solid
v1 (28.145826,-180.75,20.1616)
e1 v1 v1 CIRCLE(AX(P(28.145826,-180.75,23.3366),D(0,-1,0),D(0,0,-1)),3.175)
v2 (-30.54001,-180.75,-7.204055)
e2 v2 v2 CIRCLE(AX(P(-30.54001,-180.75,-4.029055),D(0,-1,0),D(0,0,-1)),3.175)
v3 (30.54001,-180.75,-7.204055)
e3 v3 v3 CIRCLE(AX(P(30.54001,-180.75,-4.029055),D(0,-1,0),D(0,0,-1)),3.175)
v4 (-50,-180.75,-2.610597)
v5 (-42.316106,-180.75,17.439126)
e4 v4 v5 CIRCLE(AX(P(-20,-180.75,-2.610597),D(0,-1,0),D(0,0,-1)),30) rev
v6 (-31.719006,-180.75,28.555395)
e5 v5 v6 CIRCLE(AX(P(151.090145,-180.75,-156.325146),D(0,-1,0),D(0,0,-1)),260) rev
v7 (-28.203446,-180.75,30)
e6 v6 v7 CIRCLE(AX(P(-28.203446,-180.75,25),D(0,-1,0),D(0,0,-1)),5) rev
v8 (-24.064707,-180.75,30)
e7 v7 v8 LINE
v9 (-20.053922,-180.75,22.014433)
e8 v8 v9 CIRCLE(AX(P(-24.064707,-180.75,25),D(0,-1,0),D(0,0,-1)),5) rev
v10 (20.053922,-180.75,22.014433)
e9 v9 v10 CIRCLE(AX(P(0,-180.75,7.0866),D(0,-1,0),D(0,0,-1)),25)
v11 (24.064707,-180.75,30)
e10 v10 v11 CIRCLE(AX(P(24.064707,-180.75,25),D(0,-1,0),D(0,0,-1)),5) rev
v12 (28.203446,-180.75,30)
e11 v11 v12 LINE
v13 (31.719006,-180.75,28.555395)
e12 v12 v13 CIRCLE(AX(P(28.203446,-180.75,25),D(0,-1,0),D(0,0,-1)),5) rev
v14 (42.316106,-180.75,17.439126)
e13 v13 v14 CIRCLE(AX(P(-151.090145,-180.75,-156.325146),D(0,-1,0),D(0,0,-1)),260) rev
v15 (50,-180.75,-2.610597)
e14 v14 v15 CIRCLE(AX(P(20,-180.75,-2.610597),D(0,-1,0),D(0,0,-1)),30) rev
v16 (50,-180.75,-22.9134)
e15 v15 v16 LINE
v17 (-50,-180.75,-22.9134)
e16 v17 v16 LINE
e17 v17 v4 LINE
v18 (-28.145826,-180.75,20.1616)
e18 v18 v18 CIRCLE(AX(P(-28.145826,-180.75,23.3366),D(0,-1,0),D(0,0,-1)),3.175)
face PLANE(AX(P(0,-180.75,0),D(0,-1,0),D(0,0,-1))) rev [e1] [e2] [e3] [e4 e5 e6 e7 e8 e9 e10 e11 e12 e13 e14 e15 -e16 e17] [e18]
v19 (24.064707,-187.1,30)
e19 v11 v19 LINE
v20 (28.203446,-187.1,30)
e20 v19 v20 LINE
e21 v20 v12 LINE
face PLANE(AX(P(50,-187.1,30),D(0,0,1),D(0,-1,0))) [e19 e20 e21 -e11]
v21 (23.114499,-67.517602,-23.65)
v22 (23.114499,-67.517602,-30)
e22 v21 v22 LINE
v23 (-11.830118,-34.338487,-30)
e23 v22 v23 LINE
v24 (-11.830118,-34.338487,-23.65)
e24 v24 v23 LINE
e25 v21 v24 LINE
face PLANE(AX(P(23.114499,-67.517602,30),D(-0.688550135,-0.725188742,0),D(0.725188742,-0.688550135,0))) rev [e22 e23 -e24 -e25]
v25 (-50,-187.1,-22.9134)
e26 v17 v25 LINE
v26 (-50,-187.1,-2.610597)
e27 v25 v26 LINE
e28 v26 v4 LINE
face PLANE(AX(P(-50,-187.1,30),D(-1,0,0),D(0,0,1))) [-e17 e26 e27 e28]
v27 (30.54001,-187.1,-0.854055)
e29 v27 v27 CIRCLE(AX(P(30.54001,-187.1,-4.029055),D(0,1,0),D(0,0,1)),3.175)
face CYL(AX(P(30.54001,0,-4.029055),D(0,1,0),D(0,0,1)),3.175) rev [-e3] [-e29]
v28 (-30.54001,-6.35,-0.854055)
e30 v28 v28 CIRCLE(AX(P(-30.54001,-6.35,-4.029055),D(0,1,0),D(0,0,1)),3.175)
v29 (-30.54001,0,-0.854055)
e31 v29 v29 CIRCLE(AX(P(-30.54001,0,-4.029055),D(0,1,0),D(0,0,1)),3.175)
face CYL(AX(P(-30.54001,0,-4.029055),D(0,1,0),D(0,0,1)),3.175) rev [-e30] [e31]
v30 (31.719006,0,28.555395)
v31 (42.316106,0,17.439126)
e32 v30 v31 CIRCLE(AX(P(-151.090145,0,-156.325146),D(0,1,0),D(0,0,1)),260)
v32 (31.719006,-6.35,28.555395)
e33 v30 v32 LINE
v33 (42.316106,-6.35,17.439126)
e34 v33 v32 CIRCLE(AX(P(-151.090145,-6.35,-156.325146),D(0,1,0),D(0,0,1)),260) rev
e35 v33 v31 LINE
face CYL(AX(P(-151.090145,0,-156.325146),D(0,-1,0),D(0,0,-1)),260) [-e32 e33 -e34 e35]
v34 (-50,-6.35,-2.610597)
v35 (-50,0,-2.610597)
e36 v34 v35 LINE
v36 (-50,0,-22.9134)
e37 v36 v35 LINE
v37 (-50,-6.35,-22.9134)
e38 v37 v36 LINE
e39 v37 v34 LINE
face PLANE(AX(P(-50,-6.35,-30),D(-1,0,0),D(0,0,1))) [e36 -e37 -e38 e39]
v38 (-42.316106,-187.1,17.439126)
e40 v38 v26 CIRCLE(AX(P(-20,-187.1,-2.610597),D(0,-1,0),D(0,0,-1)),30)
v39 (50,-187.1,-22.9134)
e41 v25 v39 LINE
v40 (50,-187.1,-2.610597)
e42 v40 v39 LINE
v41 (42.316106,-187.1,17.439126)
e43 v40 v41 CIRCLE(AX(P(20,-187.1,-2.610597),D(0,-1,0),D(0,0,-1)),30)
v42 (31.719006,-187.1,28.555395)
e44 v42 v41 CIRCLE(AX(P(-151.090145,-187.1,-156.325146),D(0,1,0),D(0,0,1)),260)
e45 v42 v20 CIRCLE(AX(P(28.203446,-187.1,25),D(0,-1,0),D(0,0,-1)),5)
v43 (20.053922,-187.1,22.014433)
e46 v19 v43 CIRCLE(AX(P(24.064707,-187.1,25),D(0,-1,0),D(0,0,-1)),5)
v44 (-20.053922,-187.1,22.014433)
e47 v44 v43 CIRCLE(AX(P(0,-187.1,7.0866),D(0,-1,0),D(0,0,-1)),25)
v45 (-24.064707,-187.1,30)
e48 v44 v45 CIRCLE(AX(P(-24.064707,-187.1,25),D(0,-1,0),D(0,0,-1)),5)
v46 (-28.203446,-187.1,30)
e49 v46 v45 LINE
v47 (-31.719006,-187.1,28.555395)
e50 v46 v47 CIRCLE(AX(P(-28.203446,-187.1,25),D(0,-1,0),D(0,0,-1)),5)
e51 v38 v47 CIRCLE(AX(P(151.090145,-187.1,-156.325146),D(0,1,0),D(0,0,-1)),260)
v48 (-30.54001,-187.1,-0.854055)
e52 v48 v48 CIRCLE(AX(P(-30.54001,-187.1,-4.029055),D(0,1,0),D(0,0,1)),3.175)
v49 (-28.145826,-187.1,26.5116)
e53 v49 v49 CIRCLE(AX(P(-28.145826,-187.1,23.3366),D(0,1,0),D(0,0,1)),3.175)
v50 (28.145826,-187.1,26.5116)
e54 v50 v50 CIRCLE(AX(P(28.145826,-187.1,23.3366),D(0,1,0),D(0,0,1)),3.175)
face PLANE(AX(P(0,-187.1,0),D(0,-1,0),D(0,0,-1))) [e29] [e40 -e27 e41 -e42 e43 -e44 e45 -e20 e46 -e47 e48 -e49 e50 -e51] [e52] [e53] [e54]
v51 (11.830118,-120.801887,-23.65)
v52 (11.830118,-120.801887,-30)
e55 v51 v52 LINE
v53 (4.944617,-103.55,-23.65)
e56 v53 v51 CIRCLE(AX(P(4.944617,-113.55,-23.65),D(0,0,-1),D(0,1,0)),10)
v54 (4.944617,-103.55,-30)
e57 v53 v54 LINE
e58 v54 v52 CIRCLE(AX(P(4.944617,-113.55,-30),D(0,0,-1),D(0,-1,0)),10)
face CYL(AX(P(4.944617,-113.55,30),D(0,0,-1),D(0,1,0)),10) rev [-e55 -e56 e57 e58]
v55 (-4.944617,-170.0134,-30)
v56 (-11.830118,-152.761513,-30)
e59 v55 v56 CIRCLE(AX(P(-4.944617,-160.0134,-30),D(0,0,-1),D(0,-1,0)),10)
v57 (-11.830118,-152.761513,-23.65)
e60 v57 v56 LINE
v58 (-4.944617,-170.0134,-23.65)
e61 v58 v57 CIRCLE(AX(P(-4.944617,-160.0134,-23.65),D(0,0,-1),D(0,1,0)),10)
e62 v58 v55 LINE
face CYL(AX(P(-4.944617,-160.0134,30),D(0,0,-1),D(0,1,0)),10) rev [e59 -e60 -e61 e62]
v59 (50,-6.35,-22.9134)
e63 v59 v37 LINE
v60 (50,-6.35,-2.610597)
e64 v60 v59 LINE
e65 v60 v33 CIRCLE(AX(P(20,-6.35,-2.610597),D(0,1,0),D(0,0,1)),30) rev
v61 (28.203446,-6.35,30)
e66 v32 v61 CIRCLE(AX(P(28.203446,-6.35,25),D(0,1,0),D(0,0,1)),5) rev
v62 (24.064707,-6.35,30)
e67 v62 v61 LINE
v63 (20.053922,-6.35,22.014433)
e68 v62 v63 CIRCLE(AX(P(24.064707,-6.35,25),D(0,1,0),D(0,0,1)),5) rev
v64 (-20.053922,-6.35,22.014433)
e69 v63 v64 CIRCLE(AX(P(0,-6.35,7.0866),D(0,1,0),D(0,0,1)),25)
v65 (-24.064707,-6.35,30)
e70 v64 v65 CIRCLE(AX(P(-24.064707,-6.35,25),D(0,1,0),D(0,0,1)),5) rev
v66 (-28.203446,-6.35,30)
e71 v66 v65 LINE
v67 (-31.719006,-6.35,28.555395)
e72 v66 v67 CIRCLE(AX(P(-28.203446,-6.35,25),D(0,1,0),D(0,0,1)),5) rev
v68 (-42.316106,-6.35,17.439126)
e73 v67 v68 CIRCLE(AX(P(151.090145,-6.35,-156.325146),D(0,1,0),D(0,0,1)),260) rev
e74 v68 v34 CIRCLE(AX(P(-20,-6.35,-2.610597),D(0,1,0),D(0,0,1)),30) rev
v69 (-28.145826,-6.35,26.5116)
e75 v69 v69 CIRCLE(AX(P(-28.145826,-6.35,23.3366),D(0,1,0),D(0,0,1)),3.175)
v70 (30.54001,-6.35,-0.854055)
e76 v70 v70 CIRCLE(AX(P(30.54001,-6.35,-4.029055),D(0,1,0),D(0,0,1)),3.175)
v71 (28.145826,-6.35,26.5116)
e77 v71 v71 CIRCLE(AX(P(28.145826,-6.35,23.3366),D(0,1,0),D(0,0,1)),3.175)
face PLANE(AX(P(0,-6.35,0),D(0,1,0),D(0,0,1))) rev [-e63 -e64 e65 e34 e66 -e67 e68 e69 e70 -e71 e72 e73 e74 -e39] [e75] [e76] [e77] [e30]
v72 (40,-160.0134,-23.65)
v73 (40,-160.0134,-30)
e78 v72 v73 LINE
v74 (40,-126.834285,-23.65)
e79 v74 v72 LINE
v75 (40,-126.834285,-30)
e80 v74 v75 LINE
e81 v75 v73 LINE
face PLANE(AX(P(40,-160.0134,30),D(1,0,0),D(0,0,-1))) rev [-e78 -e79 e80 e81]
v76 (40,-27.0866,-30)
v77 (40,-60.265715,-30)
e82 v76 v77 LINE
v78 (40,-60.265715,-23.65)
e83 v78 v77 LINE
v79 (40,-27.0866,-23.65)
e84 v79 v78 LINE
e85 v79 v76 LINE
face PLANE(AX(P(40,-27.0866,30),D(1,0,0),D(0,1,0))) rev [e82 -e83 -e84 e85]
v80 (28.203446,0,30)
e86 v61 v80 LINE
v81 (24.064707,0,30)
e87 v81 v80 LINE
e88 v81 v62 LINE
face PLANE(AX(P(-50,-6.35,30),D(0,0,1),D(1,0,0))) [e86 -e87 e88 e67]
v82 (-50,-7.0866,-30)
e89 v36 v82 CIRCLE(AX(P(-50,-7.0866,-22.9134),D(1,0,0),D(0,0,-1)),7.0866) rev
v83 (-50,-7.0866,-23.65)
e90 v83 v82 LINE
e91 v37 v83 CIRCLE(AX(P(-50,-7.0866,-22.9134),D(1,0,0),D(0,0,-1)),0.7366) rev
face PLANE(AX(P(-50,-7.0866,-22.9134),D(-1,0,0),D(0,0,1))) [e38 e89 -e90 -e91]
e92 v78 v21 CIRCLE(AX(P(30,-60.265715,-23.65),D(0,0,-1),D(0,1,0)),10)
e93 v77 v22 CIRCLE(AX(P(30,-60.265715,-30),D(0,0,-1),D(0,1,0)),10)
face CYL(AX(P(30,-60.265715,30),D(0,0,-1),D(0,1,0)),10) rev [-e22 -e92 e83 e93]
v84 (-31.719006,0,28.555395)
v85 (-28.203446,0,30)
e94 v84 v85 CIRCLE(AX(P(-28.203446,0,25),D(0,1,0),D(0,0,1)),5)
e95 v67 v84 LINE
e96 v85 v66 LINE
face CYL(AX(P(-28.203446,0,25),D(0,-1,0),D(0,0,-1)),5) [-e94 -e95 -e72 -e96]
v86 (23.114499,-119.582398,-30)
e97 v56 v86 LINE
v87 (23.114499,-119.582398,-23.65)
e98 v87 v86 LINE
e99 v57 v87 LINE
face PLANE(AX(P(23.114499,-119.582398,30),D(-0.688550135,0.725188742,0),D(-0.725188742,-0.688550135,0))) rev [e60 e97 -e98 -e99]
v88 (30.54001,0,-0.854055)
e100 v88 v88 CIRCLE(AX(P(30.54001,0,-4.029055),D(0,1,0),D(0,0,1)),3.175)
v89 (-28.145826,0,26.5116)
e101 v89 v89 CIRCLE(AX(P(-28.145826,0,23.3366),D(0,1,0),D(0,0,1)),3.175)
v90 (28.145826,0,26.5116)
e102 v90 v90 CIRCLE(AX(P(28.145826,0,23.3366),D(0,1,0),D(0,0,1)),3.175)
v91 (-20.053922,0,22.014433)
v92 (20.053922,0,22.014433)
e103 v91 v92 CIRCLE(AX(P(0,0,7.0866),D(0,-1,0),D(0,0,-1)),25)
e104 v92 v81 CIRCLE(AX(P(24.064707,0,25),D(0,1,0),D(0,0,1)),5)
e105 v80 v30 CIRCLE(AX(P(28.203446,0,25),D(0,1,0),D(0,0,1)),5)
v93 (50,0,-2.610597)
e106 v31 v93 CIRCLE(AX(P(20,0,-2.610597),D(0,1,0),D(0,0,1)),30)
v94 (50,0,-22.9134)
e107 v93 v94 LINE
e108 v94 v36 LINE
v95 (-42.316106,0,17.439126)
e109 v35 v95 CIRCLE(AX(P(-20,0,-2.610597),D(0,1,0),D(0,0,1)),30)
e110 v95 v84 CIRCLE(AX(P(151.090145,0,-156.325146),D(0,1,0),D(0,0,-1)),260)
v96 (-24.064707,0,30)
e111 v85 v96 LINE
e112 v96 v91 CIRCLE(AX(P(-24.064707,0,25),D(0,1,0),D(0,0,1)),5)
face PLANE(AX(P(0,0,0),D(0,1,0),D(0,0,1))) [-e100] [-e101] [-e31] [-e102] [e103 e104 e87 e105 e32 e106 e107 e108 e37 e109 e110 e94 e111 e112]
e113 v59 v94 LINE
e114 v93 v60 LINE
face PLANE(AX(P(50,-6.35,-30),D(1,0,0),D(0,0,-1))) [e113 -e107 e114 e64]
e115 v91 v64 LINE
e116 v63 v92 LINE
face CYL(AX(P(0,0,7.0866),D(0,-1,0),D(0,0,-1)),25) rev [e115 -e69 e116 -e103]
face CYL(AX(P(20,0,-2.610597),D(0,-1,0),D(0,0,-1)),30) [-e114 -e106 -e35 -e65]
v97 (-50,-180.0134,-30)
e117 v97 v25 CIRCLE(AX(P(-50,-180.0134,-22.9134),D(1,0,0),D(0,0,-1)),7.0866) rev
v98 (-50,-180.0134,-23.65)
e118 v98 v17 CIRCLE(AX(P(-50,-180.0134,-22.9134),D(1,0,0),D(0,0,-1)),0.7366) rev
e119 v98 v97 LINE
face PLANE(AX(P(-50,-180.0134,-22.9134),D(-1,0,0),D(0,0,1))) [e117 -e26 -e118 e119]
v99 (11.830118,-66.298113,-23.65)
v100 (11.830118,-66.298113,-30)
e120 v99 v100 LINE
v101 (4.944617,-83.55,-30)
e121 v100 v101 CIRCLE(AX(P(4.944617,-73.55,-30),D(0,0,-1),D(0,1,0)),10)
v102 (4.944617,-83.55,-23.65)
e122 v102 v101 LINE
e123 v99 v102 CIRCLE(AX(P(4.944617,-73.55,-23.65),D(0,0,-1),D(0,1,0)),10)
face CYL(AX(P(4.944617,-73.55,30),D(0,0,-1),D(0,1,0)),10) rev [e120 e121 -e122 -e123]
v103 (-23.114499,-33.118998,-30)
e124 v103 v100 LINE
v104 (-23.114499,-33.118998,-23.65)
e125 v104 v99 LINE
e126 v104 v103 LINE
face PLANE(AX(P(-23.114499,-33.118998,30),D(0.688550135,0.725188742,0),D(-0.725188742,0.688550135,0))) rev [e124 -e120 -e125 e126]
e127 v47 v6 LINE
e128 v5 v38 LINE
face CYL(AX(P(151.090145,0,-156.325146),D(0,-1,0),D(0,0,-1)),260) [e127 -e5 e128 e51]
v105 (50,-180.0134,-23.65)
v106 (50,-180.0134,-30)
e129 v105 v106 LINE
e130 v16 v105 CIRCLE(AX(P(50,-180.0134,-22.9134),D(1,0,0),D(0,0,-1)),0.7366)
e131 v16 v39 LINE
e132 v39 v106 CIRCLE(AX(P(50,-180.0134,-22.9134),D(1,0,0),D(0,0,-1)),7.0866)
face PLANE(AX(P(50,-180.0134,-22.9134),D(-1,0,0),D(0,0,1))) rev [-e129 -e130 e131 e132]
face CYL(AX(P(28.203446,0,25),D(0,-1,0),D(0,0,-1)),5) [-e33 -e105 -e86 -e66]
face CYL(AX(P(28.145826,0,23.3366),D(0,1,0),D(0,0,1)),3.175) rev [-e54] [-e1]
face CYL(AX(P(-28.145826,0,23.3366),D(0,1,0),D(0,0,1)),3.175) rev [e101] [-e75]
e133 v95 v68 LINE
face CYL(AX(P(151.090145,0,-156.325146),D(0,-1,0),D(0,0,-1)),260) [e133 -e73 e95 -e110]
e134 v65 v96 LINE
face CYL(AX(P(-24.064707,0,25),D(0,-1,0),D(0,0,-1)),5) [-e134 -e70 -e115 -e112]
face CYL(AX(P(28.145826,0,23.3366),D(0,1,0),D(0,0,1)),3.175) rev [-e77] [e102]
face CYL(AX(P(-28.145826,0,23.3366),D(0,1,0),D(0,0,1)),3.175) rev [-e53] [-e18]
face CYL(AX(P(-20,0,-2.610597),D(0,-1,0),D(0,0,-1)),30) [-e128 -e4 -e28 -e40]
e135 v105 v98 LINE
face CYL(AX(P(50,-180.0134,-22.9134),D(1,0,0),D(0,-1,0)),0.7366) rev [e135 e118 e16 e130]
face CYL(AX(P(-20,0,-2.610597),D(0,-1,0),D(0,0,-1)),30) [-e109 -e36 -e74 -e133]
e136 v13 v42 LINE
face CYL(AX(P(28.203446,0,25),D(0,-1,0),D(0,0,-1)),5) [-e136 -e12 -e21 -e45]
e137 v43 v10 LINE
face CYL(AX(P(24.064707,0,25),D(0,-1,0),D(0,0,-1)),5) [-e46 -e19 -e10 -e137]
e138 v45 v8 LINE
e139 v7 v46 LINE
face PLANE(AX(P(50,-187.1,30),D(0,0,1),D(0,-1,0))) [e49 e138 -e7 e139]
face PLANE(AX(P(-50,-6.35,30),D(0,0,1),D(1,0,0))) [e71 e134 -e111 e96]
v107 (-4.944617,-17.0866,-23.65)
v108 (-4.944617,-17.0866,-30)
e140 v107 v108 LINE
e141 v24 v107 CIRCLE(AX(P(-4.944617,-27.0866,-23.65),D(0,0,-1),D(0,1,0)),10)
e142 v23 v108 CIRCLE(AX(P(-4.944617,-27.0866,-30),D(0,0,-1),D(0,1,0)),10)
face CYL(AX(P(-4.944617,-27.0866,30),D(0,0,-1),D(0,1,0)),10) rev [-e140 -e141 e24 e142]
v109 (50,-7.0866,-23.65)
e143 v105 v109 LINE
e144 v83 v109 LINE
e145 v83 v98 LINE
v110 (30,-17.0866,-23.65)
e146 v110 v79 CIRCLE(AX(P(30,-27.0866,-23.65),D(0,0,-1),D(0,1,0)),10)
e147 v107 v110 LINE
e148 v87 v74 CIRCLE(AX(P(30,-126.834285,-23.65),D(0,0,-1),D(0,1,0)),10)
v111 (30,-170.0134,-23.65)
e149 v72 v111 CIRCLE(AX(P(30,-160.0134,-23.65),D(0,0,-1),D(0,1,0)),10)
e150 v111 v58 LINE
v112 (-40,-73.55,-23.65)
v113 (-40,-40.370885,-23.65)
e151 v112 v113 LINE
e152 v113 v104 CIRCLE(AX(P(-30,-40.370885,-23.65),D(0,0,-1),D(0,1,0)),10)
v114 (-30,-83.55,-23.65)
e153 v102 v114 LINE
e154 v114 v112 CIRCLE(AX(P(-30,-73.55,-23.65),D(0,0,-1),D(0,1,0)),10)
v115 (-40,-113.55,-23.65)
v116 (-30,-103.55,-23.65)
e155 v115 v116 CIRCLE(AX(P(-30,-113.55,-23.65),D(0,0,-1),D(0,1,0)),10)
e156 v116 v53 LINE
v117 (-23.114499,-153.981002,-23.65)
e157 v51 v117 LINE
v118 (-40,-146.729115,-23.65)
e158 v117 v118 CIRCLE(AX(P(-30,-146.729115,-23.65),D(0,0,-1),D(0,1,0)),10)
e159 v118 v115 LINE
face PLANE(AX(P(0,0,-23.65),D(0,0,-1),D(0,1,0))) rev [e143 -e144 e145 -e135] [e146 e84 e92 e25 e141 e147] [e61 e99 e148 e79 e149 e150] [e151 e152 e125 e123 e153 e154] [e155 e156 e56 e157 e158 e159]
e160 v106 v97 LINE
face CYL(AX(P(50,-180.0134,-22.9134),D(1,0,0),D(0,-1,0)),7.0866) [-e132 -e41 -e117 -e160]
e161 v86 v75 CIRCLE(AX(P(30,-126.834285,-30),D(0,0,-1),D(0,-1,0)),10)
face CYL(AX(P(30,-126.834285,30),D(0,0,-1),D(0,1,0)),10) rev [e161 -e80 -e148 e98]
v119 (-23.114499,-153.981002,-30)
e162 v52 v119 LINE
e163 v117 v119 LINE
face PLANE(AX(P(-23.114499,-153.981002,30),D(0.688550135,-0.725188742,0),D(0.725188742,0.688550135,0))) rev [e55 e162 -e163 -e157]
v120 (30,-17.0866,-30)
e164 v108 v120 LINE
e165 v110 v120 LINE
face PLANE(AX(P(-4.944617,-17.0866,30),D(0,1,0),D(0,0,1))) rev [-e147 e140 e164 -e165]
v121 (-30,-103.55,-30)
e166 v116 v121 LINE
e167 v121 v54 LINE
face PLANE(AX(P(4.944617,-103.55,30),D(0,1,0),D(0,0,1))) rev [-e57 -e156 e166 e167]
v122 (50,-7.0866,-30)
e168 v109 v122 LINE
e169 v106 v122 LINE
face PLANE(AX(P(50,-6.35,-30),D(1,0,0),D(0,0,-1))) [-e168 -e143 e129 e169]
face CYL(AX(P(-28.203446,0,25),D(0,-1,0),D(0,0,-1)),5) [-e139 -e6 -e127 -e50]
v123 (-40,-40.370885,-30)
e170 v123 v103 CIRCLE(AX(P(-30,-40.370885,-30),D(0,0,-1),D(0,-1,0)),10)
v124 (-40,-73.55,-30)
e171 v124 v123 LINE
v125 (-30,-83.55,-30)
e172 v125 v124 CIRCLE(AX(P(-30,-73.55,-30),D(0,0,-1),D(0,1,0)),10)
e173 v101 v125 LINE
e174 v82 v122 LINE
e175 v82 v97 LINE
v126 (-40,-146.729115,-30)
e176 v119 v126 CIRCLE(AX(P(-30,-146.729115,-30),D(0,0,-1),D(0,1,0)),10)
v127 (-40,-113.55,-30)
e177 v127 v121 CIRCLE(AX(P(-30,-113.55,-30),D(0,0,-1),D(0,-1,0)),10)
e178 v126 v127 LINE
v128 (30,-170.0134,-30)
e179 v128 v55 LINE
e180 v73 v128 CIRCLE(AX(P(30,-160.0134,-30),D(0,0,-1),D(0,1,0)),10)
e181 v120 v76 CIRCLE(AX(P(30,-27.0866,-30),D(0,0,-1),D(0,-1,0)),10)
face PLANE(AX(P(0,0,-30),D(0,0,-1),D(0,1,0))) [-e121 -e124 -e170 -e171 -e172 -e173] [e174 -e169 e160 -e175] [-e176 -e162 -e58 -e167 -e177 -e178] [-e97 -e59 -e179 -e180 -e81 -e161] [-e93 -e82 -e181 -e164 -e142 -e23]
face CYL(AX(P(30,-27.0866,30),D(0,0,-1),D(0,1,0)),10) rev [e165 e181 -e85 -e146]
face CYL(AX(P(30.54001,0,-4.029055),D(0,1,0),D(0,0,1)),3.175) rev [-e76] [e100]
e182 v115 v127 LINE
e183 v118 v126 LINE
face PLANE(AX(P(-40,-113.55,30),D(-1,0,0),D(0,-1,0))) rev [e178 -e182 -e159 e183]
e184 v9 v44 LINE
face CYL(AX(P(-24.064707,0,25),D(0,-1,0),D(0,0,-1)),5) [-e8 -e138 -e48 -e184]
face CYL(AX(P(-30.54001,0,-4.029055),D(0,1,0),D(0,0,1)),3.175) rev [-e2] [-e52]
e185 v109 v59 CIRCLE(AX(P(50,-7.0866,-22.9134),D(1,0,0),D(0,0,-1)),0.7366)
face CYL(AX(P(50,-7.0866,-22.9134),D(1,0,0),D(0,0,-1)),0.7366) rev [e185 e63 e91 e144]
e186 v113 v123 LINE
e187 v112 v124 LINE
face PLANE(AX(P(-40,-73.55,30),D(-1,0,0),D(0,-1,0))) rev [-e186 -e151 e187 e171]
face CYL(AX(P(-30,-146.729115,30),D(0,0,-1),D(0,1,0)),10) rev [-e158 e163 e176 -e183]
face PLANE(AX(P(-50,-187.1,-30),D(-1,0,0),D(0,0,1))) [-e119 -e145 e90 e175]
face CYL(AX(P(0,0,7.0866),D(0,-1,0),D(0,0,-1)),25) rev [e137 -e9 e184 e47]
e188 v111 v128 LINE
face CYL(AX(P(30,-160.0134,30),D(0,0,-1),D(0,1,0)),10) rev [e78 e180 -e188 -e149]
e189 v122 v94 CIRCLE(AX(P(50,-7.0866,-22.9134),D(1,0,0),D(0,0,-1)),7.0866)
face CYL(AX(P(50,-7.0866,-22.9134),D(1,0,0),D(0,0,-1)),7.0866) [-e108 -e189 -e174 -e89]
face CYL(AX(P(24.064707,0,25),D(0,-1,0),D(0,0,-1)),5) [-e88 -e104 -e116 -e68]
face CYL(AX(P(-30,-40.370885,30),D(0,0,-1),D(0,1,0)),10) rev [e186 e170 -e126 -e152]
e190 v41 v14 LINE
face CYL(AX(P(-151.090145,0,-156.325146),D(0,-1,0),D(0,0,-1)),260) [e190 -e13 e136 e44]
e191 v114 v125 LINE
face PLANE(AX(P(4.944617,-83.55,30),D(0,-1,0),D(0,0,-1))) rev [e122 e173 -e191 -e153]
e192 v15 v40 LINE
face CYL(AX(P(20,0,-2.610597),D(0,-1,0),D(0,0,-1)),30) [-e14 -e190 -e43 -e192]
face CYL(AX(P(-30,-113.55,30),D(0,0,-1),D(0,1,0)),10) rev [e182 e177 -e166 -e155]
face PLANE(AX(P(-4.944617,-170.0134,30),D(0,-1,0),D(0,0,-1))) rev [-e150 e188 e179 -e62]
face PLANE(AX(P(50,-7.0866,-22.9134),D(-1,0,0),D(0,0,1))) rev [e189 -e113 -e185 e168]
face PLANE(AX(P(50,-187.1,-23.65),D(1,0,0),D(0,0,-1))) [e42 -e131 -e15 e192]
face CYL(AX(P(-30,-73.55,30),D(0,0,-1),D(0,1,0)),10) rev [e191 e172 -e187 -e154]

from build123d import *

# Parameters (mm, degrees)
SKETCH1_W                    = 100
SKETCH1_H                    = 60
BASE_FLANGE1_DEPTH           = 6.35
EDGE_FLANGE2_STRIP_W         = 26.8732
EDGE_FLANGE2_STRIP_H         = 6.35
EDGE_FLANGE2_STRIP_CUT_DEPTH = 100
EDGE_FLANGE2_DEPTH           = 100
EDGE_FLANGE3_STRIP_W         = 26.8732
EDGE_FLANGE3_STRIP_H         = 6.35
EDGE_FLANGE3_STRIP_CUT_DEPTH = 100
EDGE_FLANGE3_DEPTH           = 100
SKETCH27_R                   = 25
CUT_EXTRUDE2_DEPTH           = 196.975534187
FILLET3_R                    = 5
F_1_4_0_25_DIAMETER_HOLE1_D  = 6.35
CUT_EXTRUDE3_DEPTH           = 203.74715781
CUT_EXTRUDE4_DEPTH           = 196.975534187
FILLET4_R                    = 30
FILLET5_R                    = 5


# Sheet-metal steps are written as plain solids
with BuildPart() as part:
    # Sketch1 → Base-Flange1 (new body)
    with BuildSketch(Plane(origin=(0, 0, 0), x_dir=(1, 0, 0), z_dir=(0, 1, 0))):
        Rectangle(SKETCH1_W, SKETCH1_H)
    extrude(amount=-BASE_FLANGE1_DEPTH)

    # Edge-Flange2 strip (across the edge) → Edge-Flange2 strip cut (cut)
    with BuildSketch(Plane(origin=(-50, -6.35, -30), x_dir=(0, 0, 1), z_dir=(1, 0, 0))):
        with Locations((-6.35, -3.175)):
            Rectangle(EDGE_FLANGE2_STRIP_W, EDGE_FLANGE2_STRIP_H)
    extrude(amount=EDGE_FLANGE2_STRIP_CUT_DEPTH, mode=Mode.SUBTRACT)

    # Edge-Flange2 section (across the edge) → Edge-Flange2 (add)
    with BuildSketch(Plane(origin=(-50, -6.35, -30), x_dir=(0, 0, 1), z_dir=(1, 0, 0))):
        with BuildLine():
            Line((0, 0.7366), (0, 180.75))
            Line((0, 180.75), (6.35, 180.75))
            Line((6.35, 180.75), (6.35, 0.7366))
            ThreePointArc((6.35, 0.7366), (6.565745145, 0.215745145), (7.0866, 0))
            Line((7.0866, 0), (7.0866, -6.35))
            ThreePointArc((7.0866, -6.35), (2.075617084, -4.274382916), (0, 0.7366))
        make_face()
    extrude(amount=EDGE_FLANGE2_DEPTH)

    # Edge-Flange3 strip (across the edge) → Edge-Flange3 strip cut (cut)
    with BuildSketch(Plane(origin=(-50, -187.1, -23.65), x_dir=(0, 1, 0), z_dir=(1, 0, 0))):
        with Locations((-6.35, -3.175)):
            Rectangle(EDGE_FLANGE3_STRIP_W, EDGE_FLANGE3_STRIP_H)
    extrude(amount=EDGE_FLANGE3_STRIP_CUT_DEPTH, mode=Mode.SUBTRACT)

    # Edge-Flange3 section (across the edge) → Edge-Flange3 (add)
    with BuildSketch(Plane(origin=(-50, -187.1, -23.65), x_dir=(0, 1, 0), z_dir=(1, 0, 0))):
        with BuildLine():
            Line((0, 0.7366), (0, 53.65))
            Line((0, 53.65), (6.35, 53.65))
            Line((6.35, 53.65), (6.35, 0.7366))
            ThreePointArc((6.35, 0.7366), (6.565745145, 0.215745145), (7.0866, 0))
            Line((7.0866, 0), (7.0866, -6.35))
            ThreePointArc((7.0866, -6.35), (2.075617084, -4.274382916), (0, 0.7366))
        make_face()
    extrude(amount=EDGE_FLANGE3_DEPTH)

    # Sketch27 → Cut-Extrude2 (cut, through all)
    with BuildSketch(Plane.XZ.offset(187.1)):
        with Locations((0, 7.0866)):
            Circle(SKETCH27_R)
    extrude(amount=-CUT_EXTRUDE2_DEPTH, mode=Mode.SUBTRACT)

    # Fillet3
    fillet3_edges = [part.edges().sort_by_distance(p)[0] for p in [
        (-50, -183.925, 30),
        (50, -183.925, 30),
        (50, -3.175, 30),
        (-50, -3.175, 30),
        (9.998804951, -183.925, 30),
        (-9.998804951, -183.925, 30),
        (-9.998804951, -3.175, 30),
        (9.998804951, -3.175, 30),
    ]]
    fillet(fillet3_edges, radius=FILLET3_R)

    # 1/4 (0.25) Diameter Hole1 (through all)
    with Locations(Plane(origin=(0, 0, 0), x_dir=(1, 0, 0), z_dir=(0, 1, 0))):
        with Locations((28.145825623, -23.3366), (-30.540010176, 4.029054658), (30.540010176, 4.029054658), (-28.145825623, -23.3366)):
            Hole(F_1_4_0_25_DIAMETER_HOLE1_D / 2)

    # Sketch30 → Cut-Extrude3 (cut, through all)
    with BuildSketch(Plane(origin=(0, 0, -30), x_dir=(-1, 0, 0), z_dir=(0, 0, -1))):
        with BuildLine():
            Line((-40, -27.0866), (-40, -60.265715002))
            ThreePointArc((-40, -60.265715002), (-33.94619985, -69.454159198), (-23.114498651, -67.517602423))
            Line((-23.114498651, -67.517602423), (11.830118238, -34.338487421))
            ThreePointArc((11.830118238, -34.338487421), (14.232212762, -23.379773474), (4.944616889, -17.0866))
            Line((4.944616889, -17.0866), (-30, -17.0866))
            ThreePointArc((-30, -17.0866), (-37.071067812, -20.015532188), (-40, -27.0866))
        make_face()
        with BuildLine():
            Line((23.114498651, -33.118997577), (-11.830118238, -66.298112579))
            ThreePointArc((-11.830118238, -66.298112579), (-14.232212762, -77.256826526), (-4.944616889, -83.55))
            Line((-4.944616889, -83.55), (30, -83.55))
            ThreePointArc((30, -83.55), (37.071067812, -80.621067812), (40, -73.55))
            Line((40, -73.55), (40, -40.370884998))
            ThreePointArc((40, -40.370884998), (33.94619985, -31.182440802), (23.114498651, -33.118997577))
        make_face()
        with BuildLine():
            Line((-23.114498651, -119.582397577), (11.830118238, -152.761512579))
            ThreePointArc((11.830118238, -152.761512579), (14.232212762, -163.720226526), (4.944616889, -170.0134))
            Line((4.944616889, -170.0134), (-30, -170.0134))
            ThreePointArc((-30, -170.0134), (-37.071067812, -167.084467812), (-40, -160.0134))
            Line((-40, -160.0134), (-40, -126.834284998))
            ThreePointArc((-40, -126.834284998), (-33.94619985, -117.645840802), (-23.114498651, -119.582397577))
        make_face()
        with BuildLine():
            Line((-4.944616889, -103.55), (30, -103.55))
            ThreePointArc((30, -103.55), (37.071067812, -106.478932188), (40, -113.55))
            Line((40, -113.55), (40, -146.729115002))
            ThreePointArc((40, -146.729115002), (33.94619985, -155.917559198), (23.114498651, -153.981002423))
            Line((23.114498651, -153.981002423), (-11.830118238, -120.801887421))
            ThreePointArc((-11.830118238, -120.801887421), (-14.232212762, -109.843173474), (-4.944616889, -103.55))
        make_face()
    extrude(amount=-CUT_EXTRUDE3_DEPTH, mode=Mode.SUBTRACT)

    # Sketch31 → Cut-Extrude4 (cut, through all)
    with BuildSketch(Plane.XZ.offset(187.1)):
        with BuildLine():
            Line((30.246393456, 30), (50, 30))
            Line((50, 30), (50, 8.486121202))
            ThreePointArc((50, 8.486121202), (40.425530077, 19.520656941), (30.246393456, 30))
        make_face()
        with BuildLine():
            Line((-30.246393456, 30), (-50, 30))
            Line((-50, 30), (-50, 8.486121202))
            ThreePointArc((-50, 8.486121202), (-40.425530077, 19.520656941), (-30.246393456, 30))
        make_face()
    extrude(amount=-CUT_EXTRUDE4_DEPTH, mode=Mode.SUBTRACT)

    # Fillet4
    fillet4_edges = [part.edges().sort_by_distance(p)[0] for p in [
        (50, -3.175, 8.486121202),
        (50, -183.925, 8.486121202),
        (-50, -3.175, 8.486121202),
        (-50, -183.925, 8.486121202),
    ]]
    fillet(fillet4_edges, radius=FILLET4_R)

    # Fillet5
    fillet5_edges = [part.edges().sort_by_distance(p)[0] for p in [
        (30.246393456, -3.175, 30),
        (30.246393456, -183.925, 30),
        (-30.246393456, -3.175, 30),
        (-30.246393456, -183.925, 30),
    ]]
    fillet(fillet5_edges, radius=FILLET5_R)


solid = part.part
